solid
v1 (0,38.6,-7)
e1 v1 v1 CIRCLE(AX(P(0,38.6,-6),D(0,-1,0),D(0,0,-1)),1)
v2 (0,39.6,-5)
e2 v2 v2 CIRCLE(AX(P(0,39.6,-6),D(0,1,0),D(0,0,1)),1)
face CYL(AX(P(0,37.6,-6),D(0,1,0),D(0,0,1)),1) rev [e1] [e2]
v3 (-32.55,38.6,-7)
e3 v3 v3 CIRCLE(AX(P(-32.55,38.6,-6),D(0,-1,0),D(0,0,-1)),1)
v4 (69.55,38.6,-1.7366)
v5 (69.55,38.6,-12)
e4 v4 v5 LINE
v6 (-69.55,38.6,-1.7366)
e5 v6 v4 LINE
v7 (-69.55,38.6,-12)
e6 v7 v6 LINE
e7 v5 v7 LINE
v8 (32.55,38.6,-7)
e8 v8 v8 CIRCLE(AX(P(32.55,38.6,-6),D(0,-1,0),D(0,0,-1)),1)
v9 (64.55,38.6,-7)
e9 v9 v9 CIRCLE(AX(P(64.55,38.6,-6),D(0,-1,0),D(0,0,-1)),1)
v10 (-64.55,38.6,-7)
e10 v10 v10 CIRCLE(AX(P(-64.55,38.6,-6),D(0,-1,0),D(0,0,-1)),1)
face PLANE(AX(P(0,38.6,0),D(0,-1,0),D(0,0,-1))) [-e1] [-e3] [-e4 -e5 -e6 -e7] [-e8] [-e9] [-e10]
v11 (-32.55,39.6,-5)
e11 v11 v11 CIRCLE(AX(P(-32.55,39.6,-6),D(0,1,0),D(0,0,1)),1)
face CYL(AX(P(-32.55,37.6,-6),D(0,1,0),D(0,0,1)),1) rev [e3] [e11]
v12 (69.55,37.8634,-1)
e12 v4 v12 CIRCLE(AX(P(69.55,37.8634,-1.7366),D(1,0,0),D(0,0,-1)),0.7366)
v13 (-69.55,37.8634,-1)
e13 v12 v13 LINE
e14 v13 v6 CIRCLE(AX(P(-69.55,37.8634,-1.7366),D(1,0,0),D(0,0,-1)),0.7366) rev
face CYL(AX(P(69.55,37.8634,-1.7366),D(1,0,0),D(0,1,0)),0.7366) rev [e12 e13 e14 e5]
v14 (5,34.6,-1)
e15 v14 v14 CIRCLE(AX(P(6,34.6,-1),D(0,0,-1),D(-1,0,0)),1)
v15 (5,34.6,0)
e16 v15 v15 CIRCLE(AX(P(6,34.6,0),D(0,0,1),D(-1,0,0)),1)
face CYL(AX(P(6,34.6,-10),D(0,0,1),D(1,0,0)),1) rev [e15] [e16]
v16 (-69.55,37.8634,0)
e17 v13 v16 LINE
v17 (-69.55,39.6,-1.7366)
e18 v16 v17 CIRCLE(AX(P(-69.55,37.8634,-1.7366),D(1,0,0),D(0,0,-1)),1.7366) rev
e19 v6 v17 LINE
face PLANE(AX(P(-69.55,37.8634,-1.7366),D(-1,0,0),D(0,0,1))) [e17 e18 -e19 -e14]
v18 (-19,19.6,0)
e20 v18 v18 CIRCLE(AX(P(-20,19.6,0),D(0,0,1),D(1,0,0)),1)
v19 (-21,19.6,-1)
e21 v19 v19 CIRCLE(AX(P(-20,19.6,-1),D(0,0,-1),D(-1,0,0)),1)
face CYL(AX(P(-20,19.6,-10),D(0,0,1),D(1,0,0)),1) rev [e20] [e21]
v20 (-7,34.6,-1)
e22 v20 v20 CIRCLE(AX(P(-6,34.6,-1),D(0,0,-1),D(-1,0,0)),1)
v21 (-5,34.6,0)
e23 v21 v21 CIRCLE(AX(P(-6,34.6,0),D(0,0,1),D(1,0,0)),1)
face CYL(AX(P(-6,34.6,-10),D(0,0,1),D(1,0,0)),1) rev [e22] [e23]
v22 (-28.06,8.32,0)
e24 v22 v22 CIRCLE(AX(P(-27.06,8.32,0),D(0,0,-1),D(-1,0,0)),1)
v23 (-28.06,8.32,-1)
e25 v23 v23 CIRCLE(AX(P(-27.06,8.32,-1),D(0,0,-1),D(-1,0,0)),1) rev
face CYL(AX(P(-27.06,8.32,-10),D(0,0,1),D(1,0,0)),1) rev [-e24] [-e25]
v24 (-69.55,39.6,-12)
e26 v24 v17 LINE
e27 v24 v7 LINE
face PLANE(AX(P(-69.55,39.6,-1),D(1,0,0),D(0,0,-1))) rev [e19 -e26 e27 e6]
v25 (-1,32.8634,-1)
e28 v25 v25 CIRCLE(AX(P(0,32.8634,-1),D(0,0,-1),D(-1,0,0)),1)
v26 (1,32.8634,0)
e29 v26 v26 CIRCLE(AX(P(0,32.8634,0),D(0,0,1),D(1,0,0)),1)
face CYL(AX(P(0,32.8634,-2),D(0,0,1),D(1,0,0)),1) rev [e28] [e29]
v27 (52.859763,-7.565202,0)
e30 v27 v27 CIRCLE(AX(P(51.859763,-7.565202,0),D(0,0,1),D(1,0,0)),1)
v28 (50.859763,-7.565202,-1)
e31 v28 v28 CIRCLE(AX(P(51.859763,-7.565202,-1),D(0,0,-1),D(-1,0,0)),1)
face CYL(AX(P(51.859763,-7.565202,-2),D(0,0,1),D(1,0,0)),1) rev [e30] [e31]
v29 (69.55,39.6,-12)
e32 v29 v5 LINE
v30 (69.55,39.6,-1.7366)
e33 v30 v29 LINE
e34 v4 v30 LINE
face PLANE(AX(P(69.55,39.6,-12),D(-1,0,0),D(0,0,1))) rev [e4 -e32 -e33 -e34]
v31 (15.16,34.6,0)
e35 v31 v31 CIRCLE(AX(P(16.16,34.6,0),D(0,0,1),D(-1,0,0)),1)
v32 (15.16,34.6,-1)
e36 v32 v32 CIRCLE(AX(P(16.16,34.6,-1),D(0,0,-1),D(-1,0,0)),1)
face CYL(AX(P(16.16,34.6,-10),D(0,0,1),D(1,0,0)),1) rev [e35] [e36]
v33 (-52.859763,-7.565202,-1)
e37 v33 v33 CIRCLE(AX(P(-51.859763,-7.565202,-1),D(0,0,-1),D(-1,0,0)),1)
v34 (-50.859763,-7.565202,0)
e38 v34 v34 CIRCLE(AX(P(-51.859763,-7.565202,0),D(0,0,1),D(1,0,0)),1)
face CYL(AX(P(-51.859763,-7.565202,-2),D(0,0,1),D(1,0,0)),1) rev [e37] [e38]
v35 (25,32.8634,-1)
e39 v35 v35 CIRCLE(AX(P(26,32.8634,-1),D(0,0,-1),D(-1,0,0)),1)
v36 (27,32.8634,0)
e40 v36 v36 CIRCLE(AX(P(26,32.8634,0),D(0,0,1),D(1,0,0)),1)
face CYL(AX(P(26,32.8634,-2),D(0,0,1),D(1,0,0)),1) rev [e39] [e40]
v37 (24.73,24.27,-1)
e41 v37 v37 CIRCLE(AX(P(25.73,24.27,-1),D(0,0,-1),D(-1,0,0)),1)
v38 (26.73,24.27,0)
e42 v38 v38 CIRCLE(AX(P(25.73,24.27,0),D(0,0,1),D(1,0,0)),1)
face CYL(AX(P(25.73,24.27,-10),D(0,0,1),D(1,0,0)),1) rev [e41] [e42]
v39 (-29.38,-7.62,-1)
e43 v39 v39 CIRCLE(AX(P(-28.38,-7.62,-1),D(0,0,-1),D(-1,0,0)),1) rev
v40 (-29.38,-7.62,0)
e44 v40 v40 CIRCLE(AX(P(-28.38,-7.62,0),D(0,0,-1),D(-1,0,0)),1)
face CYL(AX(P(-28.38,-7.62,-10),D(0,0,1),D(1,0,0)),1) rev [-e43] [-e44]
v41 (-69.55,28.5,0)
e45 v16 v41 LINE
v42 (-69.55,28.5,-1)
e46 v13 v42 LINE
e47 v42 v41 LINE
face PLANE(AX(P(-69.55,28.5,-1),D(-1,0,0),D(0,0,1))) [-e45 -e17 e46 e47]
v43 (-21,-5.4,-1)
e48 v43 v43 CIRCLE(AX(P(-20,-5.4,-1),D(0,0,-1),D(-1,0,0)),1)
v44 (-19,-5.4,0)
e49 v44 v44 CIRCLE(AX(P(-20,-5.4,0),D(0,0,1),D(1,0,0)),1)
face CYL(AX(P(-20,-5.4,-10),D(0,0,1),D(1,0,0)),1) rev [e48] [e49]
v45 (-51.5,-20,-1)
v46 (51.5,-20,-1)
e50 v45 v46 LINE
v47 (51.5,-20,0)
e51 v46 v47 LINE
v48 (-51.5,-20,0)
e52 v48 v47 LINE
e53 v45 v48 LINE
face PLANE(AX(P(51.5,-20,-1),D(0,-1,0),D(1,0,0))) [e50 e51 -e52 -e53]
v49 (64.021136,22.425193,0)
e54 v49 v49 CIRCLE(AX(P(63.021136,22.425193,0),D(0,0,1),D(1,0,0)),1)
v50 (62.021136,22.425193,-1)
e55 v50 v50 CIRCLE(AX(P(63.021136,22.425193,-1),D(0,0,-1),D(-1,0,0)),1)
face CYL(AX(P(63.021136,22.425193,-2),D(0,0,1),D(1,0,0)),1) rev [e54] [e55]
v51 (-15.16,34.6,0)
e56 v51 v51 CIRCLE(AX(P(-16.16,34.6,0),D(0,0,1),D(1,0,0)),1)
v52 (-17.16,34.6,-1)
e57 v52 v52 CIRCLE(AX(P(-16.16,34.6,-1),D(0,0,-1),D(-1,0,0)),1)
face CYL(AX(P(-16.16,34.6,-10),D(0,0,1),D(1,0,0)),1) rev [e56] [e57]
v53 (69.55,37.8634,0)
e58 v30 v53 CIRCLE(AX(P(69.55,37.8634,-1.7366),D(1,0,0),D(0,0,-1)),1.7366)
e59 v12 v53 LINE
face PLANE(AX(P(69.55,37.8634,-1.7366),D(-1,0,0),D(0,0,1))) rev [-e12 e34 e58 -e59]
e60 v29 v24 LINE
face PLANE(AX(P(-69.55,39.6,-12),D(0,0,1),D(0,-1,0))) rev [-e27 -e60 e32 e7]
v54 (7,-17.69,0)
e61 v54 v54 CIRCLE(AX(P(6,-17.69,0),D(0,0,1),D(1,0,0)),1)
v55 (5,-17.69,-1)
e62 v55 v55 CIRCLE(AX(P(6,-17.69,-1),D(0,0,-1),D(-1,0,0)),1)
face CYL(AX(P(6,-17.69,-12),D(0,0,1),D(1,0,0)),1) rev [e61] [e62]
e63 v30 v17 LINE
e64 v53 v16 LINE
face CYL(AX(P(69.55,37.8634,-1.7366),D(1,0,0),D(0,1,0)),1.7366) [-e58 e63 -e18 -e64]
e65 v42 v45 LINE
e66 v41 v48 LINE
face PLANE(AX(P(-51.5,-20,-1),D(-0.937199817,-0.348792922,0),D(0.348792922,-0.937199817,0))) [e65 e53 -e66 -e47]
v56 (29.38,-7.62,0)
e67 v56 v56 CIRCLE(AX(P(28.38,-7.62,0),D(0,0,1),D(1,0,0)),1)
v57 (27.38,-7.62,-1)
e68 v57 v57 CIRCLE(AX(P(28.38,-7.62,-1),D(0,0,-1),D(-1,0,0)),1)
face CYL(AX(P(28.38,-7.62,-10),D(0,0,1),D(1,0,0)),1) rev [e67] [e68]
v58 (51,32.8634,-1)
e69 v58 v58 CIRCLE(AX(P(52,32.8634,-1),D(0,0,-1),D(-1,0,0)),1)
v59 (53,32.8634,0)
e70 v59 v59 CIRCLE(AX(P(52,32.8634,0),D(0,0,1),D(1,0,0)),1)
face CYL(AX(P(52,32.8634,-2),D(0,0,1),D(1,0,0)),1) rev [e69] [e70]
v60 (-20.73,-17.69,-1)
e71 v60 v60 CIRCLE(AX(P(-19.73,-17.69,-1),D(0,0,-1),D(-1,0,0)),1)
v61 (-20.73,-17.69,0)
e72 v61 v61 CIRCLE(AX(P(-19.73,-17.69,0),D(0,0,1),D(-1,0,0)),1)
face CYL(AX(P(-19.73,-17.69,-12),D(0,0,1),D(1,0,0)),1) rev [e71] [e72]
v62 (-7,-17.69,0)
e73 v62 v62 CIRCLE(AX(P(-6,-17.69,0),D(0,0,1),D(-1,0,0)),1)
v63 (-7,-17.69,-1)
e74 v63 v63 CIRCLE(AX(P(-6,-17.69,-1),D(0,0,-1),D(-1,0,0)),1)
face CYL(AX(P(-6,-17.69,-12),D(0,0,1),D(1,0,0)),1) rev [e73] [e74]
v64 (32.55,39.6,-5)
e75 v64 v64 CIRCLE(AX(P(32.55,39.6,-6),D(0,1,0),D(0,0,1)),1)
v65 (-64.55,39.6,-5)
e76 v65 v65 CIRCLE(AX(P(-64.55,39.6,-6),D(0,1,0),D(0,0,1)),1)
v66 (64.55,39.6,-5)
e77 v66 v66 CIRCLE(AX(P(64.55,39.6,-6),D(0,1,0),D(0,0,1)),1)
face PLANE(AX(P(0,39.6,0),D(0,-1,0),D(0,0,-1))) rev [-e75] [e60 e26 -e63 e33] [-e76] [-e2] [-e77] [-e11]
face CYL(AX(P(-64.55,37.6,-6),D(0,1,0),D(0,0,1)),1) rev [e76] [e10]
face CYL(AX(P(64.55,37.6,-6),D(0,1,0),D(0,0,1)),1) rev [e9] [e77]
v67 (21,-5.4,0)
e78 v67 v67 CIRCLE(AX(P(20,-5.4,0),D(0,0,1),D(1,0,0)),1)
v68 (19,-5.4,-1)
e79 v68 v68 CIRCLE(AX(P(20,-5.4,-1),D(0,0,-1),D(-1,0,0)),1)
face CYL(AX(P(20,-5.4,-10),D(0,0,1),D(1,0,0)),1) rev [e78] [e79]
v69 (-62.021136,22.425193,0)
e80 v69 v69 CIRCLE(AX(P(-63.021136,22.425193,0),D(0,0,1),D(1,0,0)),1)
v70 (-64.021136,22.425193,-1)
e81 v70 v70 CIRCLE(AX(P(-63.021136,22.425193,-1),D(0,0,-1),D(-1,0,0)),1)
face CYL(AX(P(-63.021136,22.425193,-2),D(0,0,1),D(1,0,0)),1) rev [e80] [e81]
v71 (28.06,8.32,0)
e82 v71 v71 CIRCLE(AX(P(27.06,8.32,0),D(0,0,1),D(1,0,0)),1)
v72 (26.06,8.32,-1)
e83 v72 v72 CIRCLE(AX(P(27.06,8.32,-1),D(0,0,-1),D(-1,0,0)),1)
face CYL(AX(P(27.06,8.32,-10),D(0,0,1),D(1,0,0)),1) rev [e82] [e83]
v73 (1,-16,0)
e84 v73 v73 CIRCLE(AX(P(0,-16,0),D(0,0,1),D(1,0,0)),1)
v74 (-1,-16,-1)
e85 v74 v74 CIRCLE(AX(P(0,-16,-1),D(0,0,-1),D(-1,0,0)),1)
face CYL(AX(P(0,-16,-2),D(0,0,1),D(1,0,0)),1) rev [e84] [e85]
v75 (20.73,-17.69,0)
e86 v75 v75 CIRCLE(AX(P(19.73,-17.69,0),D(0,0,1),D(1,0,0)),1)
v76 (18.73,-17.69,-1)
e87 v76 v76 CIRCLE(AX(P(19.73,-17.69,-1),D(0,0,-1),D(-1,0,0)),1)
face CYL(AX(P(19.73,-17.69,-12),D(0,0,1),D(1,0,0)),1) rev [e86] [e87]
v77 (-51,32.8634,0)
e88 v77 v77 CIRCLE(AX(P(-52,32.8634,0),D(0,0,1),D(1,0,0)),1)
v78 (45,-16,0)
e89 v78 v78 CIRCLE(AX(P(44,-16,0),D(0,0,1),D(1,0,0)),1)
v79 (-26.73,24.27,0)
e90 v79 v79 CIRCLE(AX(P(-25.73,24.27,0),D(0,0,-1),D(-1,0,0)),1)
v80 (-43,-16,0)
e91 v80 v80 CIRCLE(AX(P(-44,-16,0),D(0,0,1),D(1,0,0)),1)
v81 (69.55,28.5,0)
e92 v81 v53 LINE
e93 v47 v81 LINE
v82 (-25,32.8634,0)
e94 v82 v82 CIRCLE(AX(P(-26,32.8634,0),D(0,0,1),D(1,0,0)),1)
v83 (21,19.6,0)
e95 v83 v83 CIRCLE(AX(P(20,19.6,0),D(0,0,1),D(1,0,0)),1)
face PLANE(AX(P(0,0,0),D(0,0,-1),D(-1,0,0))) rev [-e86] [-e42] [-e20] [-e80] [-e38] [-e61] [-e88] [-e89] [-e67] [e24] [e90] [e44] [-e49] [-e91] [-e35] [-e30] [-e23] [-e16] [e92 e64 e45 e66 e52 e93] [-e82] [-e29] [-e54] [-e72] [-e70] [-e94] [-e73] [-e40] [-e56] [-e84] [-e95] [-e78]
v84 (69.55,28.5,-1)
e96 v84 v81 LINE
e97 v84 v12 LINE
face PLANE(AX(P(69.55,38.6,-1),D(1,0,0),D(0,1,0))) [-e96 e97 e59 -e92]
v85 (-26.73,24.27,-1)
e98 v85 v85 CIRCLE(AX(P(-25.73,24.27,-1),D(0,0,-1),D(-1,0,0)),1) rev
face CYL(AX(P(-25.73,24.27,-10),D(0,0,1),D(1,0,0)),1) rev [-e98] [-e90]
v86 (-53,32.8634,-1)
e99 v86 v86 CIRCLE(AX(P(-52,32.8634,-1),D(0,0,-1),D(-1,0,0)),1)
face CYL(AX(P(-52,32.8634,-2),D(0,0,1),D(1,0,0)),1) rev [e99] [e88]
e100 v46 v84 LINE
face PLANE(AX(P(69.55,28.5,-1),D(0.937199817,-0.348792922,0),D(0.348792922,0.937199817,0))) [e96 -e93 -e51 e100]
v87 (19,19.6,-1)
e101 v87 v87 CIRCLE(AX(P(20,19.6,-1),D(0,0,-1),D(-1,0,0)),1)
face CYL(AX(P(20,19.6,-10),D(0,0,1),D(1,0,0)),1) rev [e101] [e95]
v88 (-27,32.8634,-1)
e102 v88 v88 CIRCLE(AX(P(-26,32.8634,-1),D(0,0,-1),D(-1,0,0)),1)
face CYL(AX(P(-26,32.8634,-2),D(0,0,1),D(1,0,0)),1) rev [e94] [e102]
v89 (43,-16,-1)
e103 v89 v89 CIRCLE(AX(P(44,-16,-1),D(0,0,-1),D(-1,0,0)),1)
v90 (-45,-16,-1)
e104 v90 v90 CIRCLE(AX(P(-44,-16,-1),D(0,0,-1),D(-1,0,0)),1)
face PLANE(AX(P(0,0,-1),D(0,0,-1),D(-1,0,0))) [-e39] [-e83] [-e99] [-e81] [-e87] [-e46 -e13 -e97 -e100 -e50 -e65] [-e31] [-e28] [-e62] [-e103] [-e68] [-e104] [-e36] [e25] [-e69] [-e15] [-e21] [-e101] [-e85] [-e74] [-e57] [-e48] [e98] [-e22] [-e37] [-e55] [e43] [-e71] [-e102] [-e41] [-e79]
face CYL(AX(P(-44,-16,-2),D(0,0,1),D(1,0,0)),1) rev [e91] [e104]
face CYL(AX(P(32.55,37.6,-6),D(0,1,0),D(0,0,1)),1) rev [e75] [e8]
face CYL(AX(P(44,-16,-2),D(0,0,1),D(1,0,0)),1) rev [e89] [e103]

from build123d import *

# Parameters (mm, degrees)
SM_BASE_FLANGE_1_DEPTH           = 1
SM_EDGE_FLANGE_1_STRIP_W         = 5.4732
SM_EDGE_FLANGE_1_STRIP_H         = 1
SM_EDGE_FLANGE_1_STRIP_CUT_DEPTH = 139.1
SM_EDGE_FLANGE_1_DEPTH           = 139.1
SKETCH_7_R                       = 1
CUT_EXTRUDE_1_DEPTH              = 2
SKETCH_8_R                       = 1
CUT_EXTRUDE_2_DEPTH              = 2
SKETCH_9_R                       = 1
CUT_EXTRUDE_3_DEPTH              = 10
SKETCH_10_R                      = 1
CUT_EXTRUDE_4_DEPTH              = 10
SKETCH_11_R                      = 1
CUT_EXTRUDE_5_DEPTH              = 81.928131697
SKETCH_12_R                      = 1
CUT_EXTRUDE_6_DEPTH              = 10


# Sheet-metal steps are written as plain solids
with BuildPart() as part:
    # Sketch 1 → 基材-凸緣1 (new body)
    with BuildSketch(Plane.XY):
        Polygon((-69.55, 38.6), (69.55, 38.6), (69.55, 28.5), (51.5, -20), (-51.5, -20), (-69.55, 28.5), align=None)
    extrude(amount=-SM_BASE_FLANGE_1_DEPTH)

    # 邊線-凸緣1 strip (across the edge) → 邊線-凸緣1 strip cut (cut)
    with BuildSketch(Plane(origin=(-69.55, 38.6, -1), x_dir=(0, -1, 0), z_dir=(1, 0, 0))):
        with Locations((-2, -0.5)):
            Rectangle(SM_EDGE_FLANGE_1_STRIP_W, SM_EDGE_FLANGE_1_STRIP_H)
    extrude(amount=SM_EDGE_FLANGE_1_STRIP_CUT_DEPTH, mode=Mode.SUBTRACT)

    # 邊線-凸緣1 section (across the edge) → 邊線-凸緣1 (add)
    with BuildSketch(Plane(origin=(-69.55, 38.6, -1), x_dir=(0, -1, 0), z_dir=(1, 0, 0))):
        with BuildLine():
            Line((-1, 0.7366), (-1, 11))
            Line((-1, 11), (0, 11))
            Line((0, 11), (0, 0.7366))
            ThreePointArc((0, 0.7366), (0.215745145, 0.215745145), (0.7366, 0))
            Line((0.7366, 0), (0.7366, -1))
            ThreePointArc((0.7366, -1), (-0.491361636, -0.491361636), (-1, 0.7366))
        make_face()
    extrude(amount=SM_EDGE_FLANGE_1_DEPTH)

    # 草圖7 → 除料-伸長1 (cut)
    with BuildSketch(Plane.XY):
        with Locations((0, 32.8634)):
            Circle(SKETCH_7_R)
        with Locations((0, -16)):
            Circle(SKETCH_7_R)
        with Locations((52, 32.8634)):
            Circle(SKETCH_7_R)
        with Locations((26, 32.8634)):
            Circle(SKETCH_7_R)
        with Locations((-52, 32.8634)):
            Circle(SKETCH_7_R)
        with Locations((-26, 32.8634)):
            Circle(SKETCH_7_R)
        with Locations((-63.021136316, 22.425192514)):
            Circle(SKETCH_7_R)
        with Locations((-51.859762821, -7.565201643)):
            Circle(SKETCH_7_R)
        with Locations((51.859762821, -7.565201643)):
            Circle(SKETCH_7_R)
        with Locations((63.021136316, 22.425192514)):
            Circle(SKETCH_7_R)
        with Locations((44, -16)):
            Circle(SKETCH_7_R)
        with Locations((-44, -16)):
            Circle(SKETCH_7_R)
    extrude(amount=-CUT_EXTRUDE_1_DEPTH, mode=Mode.SUBTRACT)

    # 草圖8 → 除料-伸長2 (cut)
    with BuildSketch(Plane(origin=(0, 39.6, 0), x_dir=(1, 0, 0), z_dir=(0, 1, 0))):
        with Locations(Location((0, 6, 0), (0, 0, 270))):
            Circle(SKETCH_8_R)
        with Locations(Location((64.55, 6, 0), (0, 0, 270))):
            Circle(SKETCH_8_R)
        with Locations(Location((-64.55, 6, 0), (0, 0, 270))):
            Circle(SKETCH_8_R)
        with Locations(Location((-32.55, 6, 0), (0, 0, 270))):
            Circle(SKETCH_8_R)
        with Locations(Location((32.55, 6, 0), (0, 0, 270))):
            Circle(SKETCH_8_R)
    extrude(amount=-CUT_EXTRUDE_2_DEPTH, mode=Mode.SUBTRACT)

    # 草圖9 → 除料-伸長3 (cut)
    with BuildSketch(Plane.XY):
        with Locations((-6, 34.6)):
            Circle(SKETCH_9_R)
        with Locations((-16.16, 34.6)):
            Circle(SKETCH_9_R)
        with Locations(Location((16.16, 34.6, 0), (0, 0, 180))):
            Circle(SKETCH_9_R)
        with Locations(Location((6, 34.6, 0), (0, 0, 180))):
            Circle(SKETCH_9_R)
    extrude(amount=-CUT_EXTRUDE_3_DEPTH, mode=Mode.SUBTRACT)

    # 草圖10 → 除料-伸長4 (cut)
    with BuildSketch(Plane.XY):
        with Locations((-20, 19.6)):
            Circle(SKETCH_10_R)
        with Locations((20, 19.6)):
            Circle(SKETCH_10_R)
        with Locations((20, -5.4)):
            Circle(SKETCH_10_R)
        with Locations((-20, -5.4)):
            Circle(SKETCH_10_R)
    extrude(amount=-CUT_EXTRUDE_4_DEPTH, mode=Mode.SUBTRACT)

    # 草圖11 → 除料-伸長5 (cut, through all)
    with BuildSketch(Plane.XY):
        with Locations((19.73, -17.69)):
            Circle(SKETCH_11_R)
        with Locations((6, -17.69)):
            Circle(SKETCH_11_R)
        with Locations(Location((-19.73, -17.69, 0), (0, 0, 180))):
            Circle(SKETCH_11_R)
        with Locations(Location((-6, -17.69, 0), (0, 0, 180))):
            Circle(SKETCH_11_R)
    extrude(amount=-CUT_EXTRUDE_5_DEPTH, mode=Mode.SUBTRACT)

    # 草圖12 → 除料-伸長6 (cut)
    with BuildSketch(Plane.XY):
        with Locations((25.73, 24.27)):
            Circle(SKETCH_12_R)
        with Locations((27.06, 8.32)):
            Circle(SKETCH_12_R)
        with Locations((28.38, -7.62)):
            Circle(SKETCH_12_R)
    cut_extrude_6 = extrude(amount=-CUT_EXTRUDE_6_DEPTH, mode=Mode.SUBTRACT)

    # 鏡射1: 除料-伸長6 across plane
    add(cut_extrude_6.mirror(Plane(origin=(0, 0, 0), x_dir=(0, 0, 1), z_dir=(1, 0, 0))), mode=Mode.SUBTRACT)


solid = part.part
